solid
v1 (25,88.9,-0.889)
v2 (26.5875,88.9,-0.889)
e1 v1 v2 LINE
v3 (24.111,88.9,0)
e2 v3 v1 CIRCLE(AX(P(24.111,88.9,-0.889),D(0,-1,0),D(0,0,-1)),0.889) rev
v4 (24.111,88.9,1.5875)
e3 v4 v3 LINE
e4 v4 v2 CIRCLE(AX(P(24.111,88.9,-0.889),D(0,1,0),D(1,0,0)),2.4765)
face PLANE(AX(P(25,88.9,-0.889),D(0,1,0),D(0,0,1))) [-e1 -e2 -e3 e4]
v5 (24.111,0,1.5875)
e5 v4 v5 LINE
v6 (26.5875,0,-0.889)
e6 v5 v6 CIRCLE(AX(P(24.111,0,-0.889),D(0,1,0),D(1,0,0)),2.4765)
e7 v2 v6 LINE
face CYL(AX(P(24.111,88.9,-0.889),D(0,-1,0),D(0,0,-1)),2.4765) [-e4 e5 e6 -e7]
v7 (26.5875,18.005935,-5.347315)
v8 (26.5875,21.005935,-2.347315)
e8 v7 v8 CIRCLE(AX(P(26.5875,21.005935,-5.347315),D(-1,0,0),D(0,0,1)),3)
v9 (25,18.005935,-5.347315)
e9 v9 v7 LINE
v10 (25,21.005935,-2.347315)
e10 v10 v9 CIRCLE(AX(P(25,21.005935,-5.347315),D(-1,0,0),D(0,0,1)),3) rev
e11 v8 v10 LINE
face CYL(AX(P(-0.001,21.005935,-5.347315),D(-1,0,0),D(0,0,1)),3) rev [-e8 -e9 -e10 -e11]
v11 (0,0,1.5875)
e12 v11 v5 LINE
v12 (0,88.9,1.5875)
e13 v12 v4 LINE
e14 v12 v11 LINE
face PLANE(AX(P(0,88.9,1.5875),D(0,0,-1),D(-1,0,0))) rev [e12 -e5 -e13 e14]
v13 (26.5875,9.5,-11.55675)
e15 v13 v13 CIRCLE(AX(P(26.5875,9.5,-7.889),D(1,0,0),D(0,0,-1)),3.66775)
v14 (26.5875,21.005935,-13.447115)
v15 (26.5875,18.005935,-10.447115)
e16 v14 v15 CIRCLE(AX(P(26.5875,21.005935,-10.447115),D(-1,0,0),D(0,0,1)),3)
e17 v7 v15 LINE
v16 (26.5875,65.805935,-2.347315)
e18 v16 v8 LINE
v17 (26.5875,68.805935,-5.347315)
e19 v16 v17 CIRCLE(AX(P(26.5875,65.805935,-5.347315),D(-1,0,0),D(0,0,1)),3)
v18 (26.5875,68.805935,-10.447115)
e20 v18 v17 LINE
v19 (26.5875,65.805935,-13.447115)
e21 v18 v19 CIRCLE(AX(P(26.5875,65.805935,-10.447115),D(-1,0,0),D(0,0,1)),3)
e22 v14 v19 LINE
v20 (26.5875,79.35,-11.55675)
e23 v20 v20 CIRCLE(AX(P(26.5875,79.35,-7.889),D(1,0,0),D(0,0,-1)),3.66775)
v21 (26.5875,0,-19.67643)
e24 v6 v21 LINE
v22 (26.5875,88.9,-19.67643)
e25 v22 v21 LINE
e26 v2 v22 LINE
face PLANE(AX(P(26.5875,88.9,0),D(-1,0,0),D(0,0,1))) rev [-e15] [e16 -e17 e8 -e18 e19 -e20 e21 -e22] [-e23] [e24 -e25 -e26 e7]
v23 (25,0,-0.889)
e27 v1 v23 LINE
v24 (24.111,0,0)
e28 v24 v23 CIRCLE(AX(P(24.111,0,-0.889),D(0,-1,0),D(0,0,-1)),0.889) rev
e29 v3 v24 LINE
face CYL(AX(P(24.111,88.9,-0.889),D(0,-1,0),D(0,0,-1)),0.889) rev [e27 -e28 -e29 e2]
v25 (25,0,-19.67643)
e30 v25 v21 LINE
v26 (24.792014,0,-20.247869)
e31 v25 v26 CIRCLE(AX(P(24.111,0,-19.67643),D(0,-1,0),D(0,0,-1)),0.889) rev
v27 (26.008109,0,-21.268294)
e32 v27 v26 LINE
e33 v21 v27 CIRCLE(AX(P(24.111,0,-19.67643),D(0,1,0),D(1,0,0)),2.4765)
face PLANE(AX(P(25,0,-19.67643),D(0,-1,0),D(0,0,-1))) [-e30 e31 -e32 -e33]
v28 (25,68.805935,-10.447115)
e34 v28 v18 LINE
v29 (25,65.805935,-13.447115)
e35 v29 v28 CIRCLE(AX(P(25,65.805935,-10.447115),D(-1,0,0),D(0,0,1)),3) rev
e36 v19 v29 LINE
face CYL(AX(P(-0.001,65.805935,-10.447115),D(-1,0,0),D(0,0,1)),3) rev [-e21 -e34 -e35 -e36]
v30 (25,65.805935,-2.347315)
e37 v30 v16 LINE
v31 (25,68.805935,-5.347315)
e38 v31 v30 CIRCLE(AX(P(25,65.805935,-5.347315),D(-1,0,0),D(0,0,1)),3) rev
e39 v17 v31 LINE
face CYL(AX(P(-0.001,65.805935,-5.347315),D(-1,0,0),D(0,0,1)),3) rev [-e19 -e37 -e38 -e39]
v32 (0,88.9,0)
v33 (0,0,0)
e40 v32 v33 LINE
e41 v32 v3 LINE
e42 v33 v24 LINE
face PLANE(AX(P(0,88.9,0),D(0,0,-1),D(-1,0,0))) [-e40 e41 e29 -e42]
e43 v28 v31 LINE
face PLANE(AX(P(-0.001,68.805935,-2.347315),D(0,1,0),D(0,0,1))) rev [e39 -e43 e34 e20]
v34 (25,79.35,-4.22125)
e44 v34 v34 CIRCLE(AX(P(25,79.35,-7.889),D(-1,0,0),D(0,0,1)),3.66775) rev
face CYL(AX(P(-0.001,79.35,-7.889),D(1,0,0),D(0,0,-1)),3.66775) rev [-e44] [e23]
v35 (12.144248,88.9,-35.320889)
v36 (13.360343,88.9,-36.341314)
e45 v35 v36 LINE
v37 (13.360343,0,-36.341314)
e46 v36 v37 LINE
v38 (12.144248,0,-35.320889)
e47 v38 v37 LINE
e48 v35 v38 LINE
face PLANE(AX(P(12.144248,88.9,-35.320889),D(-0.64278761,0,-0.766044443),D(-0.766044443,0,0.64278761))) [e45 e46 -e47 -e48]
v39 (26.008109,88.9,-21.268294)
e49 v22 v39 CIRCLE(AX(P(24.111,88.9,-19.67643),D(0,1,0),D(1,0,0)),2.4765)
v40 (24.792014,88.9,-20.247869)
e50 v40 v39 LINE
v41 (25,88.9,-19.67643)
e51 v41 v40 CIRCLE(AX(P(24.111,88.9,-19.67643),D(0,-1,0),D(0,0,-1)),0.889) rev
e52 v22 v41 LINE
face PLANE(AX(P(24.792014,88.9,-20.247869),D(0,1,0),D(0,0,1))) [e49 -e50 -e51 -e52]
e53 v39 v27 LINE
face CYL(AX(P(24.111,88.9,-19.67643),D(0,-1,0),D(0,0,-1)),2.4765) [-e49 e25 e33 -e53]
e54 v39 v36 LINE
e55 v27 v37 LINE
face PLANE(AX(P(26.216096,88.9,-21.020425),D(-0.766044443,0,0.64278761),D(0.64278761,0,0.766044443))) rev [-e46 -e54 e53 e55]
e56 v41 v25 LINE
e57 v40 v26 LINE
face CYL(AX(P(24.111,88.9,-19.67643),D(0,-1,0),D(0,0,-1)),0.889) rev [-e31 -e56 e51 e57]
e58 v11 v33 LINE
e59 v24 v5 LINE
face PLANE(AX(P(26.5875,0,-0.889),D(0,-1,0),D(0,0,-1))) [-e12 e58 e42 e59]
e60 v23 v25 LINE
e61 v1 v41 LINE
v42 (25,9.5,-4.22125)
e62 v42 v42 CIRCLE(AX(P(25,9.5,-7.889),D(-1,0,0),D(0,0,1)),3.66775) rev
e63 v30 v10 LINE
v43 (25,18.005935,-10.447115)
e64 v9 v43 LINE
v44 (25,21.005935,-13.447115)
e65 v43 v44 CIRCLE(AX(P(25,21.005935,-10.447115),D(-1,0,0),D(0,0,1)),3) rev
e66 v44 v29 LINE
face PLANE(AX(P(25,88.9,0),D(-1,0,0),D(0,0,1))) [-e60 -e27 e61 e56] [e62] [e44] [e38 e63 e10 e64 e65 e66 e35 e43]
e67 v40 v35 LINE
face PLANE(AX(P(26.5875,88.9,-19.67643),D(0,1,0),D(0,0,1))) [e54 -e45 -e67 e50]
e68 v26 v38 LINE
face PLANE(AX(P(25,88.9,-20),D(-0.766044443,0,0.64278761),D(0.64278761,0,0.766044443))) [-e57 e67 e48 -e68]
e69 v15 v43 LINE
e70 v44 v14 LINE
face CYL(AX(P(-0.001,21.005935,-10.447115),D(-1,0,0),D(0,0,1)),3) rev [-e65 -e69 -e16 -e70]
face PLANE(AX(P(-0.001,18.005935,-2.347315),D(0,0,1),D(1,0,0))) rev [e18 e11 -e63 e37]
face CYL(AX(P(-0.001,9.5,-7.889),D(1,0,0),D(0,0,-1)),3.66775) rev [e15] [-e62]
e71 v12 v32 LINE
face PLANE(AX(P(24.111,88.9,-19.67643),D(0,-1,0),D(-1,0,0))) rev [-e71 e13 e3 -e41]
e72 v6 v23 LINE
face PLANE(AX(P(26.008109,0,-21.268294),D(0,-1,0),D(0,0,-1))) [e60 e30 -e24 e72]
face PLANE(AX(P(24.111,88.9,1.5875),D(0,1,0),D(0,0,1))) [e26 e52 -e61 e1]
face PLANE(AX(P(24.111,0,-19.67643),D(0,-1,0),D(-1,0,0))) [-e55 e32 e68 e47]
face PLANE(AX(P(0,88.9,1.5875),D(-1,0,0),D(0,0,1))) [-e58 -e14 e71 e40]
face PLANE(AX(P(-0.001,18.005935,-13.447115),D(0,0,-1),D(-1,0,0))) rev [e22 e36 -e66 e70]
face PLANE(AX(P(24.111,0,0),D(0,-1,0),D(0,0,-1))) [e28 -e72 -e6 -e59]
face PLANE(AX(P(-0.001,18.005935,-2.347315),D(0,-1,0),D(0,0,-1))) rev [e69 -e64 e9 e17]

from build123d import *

# Parameters (mm, degrees)
BASE_FLANGE1_DEPTH = 88.9
CUT_EXTRUDE1_REACH = 101.653
SKETCH6_R          = 3.667750264
SKETCH6_W          = 11.0998
SKETCH6_H          = 50.8
FILLET2_R          = 3


# Sheet-metal steps are written as plain solids
with BuildPart() as part:
    # Sketch1 → Base-Flange1 (new body)
    with BuildSketch(Plane(origin=(0, 0, 0), x_dir=(1, 0, 0), z_dir=(0, 1, 0))):
        with BuildLine():
            Line((0, 0), (24.111, 0))
            ThreePointArc((24.111, 0), (24.739617928, 0.260382072), (25, 0.889))
            Line((25, 0.889), (25, 19.676430462))
            ThreePointArc((25, 19.676430462), (24.94638674, 19.980486369), (24.79201351, 20.247868647))
            Line((24.79201351, 20.247868647), (12.144247806, 35.320888862))
            Line((12.144247806, 35.320888862), (13.36034336, 36.341314193))
            Line((13.36034336, 36.341314193), (26.008109063, 21.268293977))
            ThreePointArc((26.008109063, 21.268293977), (26.438148775, 20.523443347), (26.5875, 19.676430462))
            Line((26.5875, 19.676430462), (26.5875, 0.889))
            ThreePointArc((26.5875, 0.889), (25.862149944, -0.862149944), (24.111, -1.5875))
            Line((24.111, -1.5875), (0, -1.5875))
            Line((0, -1.5875), (0, 0))
        make_face()
    extrude(amount=BASE_FLANGE1_DEPTH)

    # Sketch6 → Cut-Extrude1 (cut, up to next)
    with BuildSketch(Plane(origin=(26.5875, 0, 0), x_dir=(0, 0, -1), z_dir=(1, 0, 0)), mode=Mode.PRIVATE) as cut_extrude1_sk1:
        with Locations((7.889, 79.35)):
            Circle(SKETCH6_R)
    cut_extrude1_tool1 = extrude(cut_extrude1_sk1.sketch, amount=-CUT_EXTRUDE1_REACH, mode=Mode.PRIVATE) & part.part
    # Sketch6 → Cut-Extrude1 (cut, up to next)
    with BuildSketch(Plane(origin=(26.5875, 0, 0), x_dir=(0, 0, -1), z_dir=(1, 0, 0)), mode=Mode.PRIVATE) as cut_extrude1_sk2:
        with Locations((7.889, 9.5)):
            Circle(SKETCH6_R)
    cut_extrude1_tool2 = extrude(cut_extrude1_sk2.sketch, amount=-CUT_EXTRUDE1_REACH, mode=Mode.PRIVATE) & part.part
    # Sketch6 → Cut-Extrude1 (cut, up to next)
    with BuildSketch(Plane(origin=(26.5875, 0, 0), x_dir=(0, 0, -1), z_dir=(1, 0, 0)), mode=Mode.PRIVATE) as cut_extrude1_sk3:
        with Locations((7.897214616, 43.4059352)):
            Rectangle(SKETCH6_W, SKETCH6_H)
    cut_extrude1_tool3 = extrude(cut_extrude1_sk3.sketch, amount=-CUT_EXTRUDE1_REACH, mode=Mode.PRIVATE) & part.part
    add(cut_extrude1_tool1.solids().sort_by_distance((26.5875, 79.35, -7.889))[0], mode=Mode.SUBTRACT)
    add(cut_extrude1_tool2.solids().sort_by_distance((26.5875, 9.5, -7.889))[0], mode=Mode.SUBTRACT)
    add(cut_extrude1_tool3.solids().sort_by_distance((26.5875, 43.405935, -7.897215))[0], mode=Mode.SUBTRACT)

    # Fillet2
    fillet2_edges = [part.edges().sort_by_distance(p)[0] for p in [
        (25.79375, 68.8059352, -13.447114616),
        (25.79375, 18.0059352, -13.447114616),
        (25.79375, 18.0059352, -2.347314616),
        (25.79375, 68.8059352, -2.347314616),
    ]]
    fillet(fillet2_edges, radius=FILLET2_R)


solid = part.part
